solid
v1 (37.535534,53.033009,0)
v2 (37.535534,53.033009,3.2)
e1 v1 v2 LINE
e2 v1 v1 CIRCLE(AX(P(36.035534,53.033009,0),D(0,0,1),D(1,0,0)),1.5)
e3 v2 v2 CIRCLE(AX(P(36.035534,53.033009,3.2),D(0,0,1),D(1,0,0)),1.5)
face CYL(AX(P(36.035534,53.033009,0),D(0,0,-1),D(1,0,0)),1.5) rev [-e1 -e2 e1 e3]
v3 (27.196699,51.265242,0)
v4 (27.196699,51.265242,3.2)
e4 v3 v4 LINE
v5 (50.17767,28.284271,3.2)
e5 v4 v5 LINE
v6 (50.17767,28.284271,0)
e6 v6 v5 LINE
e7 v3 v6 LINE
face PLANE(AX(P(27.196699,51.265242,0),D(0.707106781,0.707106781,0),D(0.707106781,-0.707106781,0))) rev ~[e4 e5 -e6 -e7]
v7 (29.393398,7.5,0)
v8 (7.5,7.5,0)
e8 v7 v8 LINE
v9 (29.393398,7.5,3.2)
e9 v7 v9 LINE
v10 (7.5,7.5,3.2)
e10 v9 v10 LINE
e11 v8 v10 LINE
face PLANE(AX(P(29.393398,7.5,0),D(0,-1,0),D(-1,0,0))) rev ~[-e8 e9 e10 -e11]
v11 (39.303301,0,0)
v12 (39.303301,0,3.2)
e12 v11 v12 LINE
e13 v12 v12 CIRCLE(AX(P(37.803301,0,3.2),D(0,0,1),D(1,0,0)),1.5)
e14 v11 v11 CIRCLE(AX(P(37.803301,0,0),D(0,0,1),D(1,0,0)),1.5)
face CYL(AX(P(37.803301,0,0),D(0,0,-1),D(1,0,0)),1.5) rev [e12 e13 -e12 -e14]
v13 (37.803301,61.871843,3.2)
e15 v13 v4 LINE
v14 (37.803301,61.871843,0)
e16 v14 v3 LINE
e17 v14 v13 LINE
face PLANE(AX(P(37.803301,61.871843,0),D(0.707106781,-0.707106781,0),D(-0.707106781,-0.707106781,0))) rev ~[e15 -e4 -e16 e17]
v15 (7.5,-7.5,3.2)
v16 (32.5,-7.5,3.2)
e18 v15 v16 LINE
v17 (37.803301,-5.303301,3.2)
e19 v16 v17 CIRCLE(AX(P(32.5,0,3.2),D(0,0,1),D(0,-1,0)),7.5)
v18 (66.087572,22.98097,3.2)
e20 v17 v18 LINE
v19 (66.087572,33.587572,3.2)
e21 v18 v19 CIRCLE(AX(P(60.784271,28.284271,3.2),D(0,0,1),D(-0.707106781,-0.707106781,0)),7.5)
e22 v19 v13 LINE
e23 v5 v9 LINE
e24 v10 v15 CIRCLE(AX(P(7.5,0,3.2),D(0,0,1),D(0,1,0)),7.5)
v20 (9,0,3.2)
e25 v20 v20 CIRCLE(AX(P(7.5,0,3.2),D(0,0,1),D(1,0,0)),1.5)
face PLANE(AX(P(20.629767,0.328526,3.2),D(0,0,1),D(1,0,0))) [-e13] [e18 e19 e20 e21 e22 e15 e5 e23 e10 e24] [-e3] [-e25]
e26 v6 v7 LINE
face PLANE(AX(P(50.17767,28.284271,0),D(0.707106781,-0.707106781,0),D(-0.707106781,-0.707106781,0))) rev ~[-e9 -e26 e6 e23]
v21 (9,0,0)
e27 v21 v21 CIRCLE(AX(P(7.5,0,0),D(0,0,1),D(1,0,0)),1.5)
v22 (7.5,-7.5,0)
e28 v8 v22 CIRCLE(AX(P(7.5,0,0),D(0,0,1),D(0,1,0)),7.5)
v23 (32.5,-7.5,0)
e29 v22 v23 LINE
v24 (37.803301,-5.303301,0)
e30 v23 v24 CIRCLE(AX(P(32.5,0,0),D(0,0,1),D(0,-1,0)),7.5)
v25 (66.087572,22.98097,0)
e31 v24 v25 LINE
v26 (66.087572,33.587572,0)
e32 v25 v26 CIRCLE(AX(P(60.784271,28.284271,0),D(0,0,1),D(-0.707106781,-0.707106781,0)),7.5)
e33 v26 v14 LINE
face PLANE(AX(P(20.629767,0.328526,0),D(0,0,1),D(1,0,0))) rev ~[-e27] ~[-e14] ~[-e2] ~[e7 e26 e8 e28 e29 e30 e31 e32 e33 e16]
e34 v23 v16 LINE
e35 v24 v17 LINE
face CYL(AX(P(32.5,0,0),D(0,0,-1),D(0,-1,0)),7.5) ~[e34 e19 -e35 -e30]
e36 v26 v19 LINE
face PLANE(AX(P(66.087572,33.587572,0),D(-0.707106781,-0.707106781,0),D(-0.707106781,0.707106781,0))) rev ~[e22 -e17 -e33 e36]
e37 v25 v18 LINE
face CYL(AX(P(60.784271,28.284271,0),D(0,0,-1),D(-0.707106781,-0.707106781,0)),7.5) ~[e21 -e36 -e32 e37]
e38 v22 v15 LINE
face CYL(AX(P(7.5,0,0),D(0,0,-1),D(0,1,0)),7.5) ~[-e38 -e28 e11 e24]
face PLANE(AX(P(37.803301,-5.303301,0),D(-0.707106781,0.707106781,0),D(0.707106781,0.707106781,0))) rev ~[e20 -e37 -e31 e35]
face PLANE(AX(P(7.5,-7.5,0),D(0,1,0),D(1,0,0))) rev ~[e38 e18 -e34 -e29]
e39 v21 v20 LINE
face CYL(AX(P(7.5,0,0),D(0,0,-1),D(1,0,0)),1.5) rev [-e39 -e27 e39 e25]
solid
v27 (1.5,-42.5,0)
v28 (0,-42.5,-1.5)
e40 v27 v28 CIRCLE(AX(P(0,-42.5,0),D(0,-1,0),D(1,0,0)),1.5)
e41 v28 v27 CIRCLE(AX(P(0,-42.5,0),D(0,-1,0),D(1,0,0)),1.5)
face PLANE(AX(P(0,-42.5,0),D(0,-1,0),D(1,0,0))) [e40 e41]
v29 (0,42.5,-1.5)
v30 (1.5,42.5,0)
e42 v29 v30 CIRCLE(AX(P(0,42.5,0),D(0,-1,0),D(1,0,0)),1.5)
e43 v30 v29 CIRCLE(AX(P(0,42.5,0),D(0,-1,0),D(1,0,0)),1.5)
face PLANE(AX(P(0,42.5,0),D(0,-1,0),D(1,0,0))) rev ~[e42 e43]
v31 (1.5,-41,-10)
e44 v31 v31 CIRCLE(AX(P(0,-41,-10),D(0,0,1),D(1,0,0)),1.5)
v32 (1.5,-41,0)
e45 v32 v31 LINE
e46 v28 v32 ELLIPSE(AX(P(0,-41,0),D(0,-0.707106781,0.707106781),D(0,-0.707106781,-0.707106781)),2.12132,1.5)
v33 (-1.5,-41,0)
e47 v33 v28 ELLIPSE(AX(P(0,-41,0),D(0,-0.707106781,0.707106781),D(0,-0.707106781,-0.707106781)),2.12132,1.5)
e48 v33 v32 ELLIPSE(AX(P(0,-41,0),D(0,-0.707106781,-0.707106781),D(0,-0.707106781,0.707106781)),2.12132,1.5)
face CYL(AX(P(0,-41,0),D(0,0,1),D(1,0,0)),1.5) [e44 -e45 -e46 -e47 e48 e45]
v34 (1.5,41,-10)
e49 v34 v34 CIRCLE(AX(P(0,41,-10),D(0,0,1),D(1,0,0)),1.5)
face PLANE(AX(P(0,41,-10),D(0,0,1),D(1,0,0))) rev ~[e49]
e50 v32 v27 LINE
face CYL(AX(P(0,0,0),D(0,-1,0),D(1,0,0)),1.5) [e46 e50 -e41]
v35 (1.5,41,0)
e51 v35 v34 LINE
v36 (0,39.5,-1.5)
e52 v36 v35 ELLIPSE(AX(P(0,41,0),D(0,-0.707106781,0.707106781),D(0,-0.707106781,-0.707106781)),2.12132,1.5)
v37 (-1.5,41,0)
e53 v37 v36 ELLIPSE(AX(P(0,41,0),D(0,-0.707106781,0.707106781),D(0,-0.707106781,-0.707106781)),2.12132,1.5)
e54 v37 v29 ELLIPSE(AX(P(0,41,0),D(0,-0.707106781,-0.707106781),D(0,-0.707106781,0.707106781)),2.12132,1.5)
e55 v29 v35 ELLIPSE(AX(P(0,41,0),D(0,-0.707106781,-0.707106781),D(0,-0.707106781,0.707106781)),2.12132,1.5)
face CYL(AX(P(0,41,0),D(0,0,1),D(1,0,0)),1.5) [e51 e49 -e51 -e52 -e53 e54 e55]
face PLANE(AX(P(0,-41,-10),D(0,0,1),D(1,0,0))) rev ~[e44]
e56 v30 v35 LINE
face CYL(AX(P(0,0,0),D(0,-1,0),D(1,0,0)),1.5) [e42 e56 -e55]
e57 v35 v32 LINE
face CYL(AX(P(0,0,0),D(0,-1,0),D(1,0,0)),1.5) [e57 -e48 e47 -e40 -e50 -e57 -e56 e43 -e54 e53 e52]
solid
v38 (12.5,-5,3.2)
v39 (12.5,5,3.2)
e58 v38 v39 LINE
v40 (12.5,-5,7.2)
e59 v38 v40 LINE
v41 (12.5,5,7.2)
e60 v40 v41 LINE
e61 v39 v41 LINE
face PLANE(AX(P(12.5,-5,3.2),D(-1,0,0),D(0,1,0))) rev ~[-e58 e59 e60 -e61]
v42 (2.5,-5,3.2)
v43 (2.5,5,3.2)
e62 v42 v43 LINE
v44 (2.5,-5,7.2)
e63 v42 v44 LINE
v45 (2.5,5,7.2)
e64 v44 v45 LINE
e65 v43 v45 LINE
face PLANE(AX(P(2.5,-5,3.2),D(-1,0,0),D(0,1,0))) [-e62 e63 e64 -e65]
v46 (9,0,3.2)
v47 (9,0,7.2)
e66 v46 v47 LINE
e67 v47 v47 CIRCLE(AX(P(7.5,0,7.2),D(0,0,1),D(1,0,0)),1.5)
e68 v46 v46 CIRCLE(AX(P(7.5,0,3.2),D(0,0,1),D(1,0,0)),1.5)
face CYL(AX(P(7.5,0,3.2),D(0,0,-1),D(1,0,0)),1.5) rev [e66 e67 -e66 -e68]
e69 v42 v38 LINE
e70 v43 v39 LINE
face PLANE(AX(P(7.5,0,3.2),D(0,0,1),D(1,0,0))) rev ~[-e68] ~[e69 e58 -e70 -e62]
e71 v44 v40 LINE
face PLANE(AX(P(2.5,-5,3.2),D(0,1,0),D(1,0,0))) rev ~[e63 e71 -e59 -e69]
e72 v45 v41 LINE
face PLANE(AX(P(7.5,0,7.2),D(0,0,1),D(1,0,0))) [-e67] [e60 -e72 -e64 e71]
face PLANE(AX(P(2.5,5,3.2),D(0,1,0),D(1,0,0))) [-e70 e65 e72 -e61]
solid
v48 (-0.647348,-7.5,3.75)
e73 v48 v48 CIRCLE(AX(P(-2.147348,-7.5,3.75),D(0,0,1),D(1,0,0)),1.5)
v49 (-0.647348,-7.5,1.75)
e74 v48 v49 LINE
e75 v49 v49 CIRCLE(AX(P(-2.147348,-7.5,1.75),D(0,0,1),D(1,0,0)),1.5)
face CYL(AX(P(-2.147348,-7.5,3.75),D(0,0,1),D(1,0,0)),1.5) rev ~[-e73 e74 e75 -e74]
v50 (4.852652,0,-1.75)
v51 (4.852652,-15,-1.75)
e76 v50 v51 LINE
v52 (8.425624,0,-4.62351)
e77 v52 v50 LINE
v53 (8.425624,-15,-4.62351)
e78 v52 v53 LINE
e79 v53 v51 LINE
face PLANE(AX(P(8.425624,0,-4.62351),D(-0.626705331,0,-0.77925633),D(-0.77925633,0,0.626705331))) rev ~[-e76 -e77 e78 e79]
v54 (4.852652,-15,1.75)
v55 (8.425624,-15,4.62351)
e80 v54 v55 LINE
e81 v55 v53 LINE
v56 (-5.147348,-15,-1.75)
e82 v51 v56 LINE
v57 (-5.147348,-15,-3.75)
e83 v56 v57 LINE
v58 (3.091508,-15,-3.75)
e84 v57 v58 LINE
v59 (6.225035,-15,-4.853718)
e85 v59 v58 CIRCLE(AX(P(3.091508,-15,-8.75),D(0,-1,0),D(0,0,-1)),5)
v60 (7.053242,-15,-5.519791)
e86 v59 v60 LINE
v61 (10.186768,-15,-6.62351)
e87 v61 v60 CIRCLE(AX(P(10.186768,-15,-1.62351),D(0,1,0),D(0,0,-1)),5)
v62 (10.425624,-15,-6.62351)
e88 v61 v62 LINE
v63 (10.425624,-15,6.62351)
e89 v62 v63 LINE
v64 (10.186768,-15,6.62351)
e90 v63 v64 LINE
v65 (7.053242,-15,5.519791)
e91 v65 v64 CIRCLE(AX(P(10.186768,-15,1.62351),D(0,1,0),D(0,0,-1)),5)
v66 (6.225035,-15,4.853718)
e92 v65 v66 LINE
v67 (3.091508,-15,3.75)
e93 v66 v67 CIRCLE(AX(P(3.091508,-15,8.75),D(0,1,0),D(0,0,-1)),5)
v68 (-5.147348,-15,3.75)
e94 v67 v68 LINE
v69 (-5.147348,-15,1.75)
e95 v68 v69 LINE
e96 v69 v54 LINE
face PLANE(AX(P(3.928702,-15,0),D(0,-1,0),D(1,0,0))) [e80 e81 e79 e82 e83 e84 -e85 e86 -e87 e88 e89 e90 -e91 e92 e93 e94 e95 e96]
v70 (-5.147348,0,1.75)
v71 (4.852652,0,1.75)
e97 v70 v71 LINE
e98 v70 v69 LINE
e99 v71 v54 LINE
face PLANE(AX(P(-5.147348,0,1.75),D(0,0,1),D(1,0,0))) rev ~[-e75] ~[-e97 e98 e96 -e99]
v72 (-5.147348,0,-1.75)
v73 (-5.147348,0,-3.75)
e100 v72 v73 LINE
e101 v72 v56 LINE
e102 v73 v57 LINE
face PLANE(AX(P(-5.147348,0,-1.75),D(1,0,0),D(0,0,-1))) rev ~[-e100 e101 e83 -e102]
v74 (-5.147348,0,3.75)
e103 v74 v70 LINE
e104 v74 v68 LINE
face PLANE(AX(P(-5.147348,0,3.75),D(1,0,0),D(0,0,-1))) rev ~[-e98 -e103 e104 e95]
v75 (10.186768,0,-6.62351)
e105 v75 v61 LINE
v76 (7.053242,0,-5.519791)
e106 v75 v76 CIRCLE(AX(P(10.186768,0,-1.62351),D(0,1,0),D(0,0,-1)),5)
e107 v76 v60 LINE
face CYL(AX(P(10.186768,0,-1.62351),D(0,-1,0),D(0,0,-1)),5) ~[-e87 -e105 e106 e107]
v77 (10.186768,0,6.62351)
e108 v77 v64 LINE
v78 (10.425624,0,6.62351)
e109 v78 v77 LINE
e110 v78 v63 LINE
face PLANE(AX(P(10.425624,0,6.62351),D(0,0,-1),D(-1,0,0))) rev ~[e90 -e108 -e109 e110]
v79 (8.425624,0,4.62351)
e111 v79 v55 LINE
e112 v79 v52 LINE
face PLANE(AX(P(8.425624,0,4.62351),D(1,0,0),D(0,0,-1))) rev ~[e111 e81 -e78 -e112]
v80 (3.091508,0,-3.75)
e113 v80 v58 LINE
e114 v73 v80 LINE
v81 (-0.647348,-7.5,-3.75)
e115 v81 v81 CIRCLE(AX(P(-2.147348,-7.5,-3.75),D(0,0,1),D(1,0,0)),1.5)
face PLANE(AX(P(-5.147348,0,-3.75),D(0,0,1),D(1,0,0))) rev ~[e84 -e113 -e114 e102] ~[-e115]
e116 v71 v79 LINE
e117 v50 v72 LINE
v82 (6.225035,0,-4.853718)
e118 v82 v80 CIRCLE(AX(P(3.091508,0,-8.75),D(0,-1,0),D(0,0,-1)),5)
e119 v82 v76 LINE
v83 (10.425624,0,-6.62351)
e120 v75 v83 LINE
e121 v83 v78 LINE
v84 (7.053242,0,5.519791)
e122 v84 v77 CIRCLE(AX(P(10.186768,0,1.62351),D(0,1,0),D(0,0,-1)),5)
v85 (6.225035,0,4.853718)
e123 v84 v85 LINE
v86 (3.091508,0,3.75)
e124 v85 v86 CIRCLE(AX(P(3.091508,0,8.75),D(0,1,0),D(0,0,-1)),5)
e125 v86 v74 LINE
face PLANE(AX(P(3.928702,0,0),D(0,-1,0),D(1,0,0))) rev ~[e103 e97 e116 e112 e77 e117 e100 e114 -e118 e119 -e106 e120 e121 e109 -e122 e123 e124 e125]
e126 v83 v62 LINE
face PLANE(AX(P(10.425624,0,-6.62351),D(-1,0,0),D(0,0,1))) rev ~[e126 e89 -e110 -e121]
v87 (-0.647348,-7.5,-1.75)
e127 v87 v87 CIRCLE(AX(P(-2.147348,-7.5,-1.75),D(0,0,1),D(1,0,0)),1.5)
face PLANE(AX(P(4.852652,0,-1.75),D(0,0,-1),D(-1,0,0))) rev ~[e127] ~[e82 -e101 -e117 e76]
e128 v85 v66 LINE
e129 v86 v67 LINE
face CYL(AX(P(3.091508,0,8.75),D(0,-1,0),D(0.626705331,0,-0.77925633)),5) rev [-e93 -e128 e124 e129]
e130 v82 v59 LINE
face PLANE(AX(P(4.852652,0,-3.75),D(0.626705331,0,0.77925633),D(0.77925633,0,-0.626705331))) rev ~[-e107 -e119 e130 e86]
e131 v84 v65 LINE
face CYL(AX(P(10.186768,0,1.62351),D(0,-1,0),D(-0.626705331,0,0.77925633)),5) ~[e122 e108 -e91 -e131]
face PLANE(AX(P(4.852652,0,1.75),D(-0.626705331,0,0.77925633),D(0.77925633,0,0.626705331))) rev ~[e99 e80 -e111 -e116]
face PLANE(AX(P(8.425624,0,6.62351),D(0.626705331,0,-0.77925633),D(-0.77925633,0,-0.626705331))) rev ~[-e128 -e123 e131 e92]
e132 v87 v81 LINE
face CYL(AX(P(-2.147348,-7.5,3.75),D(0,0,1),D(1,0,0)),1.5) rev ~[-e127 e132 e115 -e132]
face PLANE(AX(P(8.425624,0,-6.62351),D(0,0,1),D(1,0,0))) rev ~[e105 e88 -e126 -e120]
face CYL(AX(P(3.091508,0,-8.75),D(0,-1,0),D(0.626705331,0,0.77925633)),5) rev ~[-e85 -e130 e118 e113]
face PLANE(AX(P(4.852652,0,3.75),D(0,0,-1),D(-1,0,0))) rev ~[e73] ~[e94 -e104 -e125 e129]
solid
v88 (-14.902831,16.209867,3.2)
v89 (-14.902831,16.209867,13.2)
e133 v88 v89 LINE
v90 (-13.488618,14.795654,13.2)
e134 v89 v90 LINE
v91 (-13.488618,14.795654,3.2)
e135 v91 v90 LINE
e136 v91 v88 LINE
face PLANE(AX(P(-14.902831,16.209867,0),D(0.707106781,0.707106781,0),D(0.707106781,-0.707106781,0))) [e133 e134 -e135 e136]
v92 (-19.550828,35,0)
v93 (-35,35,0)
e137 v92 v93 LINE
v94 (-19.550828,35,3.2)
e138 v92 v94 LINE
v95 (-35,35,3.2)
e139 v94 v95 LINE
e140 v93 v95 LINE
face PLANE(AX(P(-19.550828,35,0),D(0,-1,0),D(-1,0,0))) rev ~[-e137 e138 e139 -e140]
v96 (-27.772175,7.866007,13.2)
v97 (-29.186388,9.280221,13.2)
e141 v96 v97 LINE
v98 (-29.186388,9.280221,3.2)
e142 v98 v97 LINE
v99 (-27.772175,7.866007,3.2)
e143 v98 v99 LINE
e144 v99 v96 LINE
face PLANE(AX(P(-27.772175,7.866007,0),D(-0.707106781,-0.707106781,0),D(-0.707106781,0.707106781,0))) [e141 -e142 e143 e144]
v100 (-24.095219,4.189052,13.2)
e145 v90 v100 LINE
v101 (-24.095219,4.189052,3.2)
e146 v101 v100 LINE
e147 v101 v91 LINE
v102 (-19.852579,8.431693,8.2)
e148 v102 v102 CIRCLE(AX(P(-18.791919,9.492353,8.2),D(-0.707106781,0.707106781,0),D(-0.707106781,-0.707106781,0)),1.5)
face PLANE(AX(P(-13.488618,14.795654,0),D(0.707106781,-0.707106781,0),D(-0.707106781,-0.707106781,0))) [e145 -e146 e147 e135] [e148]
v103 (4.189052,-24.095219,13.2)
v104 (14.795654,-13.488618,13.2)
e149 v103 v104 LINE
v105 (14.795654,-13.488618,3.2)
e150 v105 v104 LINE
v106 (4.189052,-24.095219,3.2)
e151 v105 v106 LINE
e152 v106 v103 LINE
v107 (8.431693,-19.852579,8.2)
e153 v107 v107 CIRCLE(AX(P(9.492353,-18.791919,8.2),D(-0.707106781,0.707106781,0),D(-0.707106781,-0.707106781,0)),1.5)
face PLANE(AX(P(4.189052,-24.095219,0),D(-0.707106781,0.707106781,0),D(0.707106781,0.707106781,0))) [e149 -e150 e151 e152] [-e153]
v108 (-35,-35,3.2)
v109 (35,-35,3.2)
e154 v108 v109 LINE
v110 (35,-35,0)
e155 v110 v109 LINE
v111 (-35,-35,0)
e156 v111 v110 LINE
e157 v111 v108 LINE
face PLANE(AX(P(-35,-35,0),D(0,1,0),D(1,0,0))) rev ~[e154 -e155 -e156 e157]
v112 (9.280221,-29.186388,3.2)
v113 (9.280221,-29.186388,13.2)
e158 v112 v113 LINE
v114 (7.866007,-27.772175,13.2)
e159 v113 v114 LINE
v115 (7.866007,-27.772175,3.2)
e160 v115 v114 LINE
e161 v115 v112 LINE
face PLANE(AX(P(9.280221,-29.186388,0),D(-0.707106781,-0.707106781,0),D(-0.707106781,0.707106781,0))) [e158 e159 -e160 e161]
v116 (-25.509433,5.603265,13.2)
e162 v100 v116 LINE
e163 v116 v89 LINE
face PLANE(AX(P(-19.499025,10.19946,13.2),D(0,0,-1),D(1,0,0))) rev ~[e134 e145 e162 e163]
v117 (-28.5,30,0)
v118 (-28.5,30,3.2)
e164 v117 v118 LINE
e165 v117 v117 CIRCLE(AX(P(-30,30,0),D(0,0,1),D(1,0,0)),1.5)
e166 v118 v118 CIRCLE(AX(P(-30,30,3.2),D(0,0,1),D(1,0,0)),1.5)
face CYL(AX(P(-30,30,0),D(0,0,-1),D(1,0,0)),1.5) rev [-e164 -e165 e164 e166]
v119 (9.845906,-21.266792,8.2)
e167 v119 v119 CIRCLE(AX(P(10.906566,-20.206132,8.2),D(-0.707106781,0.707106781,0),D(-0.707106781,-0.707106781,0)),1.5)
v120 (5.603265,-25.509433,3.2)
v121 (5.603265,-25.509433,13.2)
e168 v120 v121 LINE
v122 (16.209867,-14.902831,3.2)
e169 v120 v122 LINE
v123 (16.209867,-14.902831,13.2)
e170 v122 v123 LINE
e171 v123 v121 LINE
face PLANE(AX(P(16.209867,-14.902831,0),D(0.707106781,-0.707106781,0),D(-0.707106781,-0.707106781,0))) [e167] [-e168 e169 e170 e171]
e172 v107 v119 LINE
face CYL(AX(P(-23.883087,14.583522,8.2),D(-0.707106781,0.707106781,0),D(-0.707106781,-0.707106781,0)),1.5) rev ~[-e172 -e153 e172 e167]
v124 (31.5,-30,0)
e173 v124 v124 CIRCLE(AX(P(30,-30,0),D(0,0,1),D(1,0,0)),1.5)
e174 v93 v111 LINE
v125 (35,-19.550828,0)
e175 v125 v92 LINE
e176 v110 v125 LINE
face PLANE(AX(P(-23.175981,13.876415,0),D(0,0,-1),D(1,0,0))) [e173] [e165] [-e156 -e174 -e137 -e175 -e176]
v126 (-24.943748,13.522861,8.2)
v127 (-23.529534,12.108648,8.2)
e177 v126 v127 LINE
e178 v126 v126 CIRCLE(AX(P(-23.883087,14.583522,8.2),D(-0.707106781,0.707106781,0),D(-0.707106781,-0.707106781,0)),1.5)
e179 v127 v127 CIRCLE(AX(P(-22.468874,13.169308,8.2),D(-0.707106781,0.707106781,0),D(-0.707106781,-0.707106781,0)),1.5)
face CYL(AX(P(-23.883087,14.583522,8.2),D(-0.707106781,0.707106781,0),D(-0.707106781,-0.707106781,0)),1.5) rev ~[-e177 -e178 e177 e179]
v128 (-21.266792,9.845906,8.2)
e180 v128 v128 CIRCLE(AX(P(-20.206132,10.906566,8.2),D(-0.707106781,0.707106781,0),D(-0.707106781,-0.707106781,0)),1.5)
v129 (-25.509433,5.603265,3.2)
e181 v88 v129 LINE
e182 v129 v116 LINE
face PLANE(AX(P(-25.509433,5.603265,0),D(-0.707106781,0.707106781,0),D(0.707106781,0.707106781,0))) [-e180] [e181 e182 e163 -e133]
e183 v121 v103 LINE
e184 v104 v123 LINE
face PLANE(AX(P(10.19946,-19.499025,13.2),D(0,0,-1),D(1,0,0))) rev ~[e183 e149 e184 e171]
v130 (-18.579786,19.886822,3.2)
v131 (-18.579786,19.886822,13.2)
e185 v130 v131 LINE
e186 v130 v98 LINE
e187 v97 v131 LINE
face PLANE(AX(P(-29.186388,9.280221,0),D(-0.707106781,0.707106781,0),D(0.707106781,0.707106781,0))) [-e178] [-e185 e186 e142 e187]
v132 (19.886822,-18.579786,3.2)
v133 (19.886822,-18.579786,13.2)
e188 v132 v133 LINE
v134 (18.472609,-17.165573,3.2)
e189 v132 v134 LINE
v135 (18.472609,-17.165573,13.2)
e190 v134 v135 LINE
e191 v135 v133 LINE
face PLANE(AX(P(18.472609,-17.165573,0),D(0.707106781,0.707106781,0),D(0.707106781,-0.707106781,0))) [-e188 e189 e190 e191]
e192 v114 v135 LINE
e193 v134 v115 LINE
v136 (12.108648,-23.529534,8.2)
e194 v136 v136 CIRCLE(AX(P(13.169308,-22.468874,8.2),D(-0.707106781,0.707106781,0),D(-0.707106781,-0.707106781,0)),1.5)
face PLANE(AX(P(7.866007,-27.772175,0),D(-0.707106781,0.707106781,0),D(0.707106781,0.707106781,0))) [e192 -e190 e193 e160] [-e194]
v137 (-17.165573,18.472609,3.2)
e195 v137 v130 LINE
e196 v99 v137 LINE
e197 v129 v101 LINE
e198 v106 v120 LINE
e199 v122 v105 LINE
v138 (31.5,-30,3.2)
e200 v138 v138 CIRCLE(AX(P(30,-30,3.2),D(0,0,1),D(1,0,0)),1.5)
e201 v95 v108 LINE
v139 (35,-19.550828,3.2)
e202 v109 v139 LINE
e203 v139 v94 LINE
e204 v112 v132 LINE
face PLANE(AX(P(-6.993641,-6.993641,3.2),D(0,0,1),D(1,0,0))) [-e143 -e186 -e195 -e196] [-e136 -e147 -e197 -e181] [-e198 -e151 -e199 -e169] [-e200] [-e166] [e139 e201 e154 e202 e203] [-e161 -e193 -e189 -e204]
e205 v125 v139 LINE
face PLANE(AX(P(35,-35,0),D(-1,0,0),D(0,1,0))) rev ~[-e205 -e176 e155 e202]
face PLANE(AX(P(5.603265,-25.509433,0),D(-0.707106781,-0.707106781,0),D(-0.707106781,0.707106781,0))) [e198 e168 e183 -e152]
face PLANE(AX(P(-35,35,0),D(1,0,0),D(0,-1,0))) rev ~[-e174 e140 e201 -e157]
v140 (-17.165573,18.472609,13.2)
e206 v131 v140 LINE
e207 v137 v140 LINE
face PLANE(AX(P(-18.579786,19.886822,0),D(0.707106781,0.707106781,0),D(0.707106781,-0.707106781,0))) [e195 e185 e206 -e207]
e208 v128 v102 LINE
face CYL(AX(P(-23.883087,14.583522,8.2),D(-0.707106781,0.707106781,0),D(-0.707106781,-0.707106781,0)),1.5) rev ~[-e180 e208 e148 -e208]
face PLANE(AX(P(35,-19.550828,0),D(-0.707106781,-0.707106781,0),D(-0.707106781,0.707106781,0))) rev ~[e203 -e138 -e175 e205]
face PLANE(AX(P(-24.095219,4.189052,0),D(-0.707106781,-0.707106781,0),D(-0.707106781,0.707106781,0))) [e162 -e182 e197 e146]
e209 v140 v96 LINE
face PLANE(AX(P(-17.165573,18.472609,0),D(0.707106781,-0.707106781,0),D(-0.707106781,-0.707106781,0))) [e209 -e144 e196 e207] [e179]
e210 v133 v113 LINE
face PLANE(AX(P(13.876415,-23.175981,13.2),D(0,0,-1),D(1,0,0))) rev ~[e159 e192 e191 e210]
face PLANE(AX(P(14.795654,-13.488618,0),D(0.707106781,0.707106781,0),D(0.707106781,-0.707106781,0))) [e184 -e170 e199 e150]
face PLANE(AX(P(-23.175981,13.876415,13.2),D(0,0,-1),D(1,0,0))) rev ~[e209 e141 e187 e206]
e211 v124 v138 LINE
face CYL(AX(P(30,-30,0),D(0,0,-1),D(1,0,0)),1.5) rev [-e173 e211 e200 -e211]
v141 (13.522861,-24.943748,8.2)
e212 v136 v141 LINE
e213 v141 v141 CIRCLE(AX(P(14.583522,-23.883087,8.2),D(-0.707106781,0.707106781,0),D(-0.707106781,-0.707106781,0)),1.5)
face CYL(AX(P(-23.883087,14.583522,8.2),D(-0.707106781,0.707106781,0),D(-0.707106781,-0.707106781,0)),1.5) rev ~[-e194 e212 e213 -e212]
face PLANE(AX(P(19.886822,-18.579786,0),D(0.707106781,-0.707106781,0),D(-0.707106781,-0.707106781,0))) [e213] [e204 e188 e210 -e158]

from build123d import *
from build123d import SkipClean  # not in build123d's __all__

# Parameters (mm, degrees)
F0_R      = 1.5
F1_DEPTH  = 3.2
F2_R      = 1.5
F3_DEPTH  = 3.2
F5_DEPTH  = 15
F6_R      = 1.5
F7_DEPTH  = 25
F8_R      = 5
F9_R      = 5
F10_W     = 10
F10_H     = 10
F10_R     = 1.5
F11_DEPTH = 4
F13_DEPTH = 13.2
F14_R     = 1.5
F15_DEPTH = 60
F16_R     = 1.5
F17_DEPTH = 42.5
F18_R     = 1.5
F19_DEPTH = 10
F20_R     = 1.5
F21_DEPTH = 10


with BuildPart() as f1:
    # F0 (on Top) → F1 (new body)
    with BuildSketch(Plane.XY):
        with BuildLine():
            Line((29.3933982822, 7.5), (7.5, 7.5))
            ThreePointArc((7.5, 7.5), (0, 0), (7.5, -7.5))
            Line((7.5, -7.5), (32.5, -7.5))
            ThreePointArc((32.5, -7.5), (35.3701257427, -6.9290964938), (37.8033008589, -5.3033008589))
            ThreePointArc((37.8033008589, -5.3033008589), (39.4290964938, 2.8701257427), (32.5, 7.5))
            ThreePointArc((32.5, 7.5), (29.6298742573, 6.9290964938), (27.1966991411, 5.3033008589))
            Line((27.1966991411, 5.3033008589), (29.3933982822, 7.5))
        make_face()
        with Locations((7.5, 0)):
            Circle(F0_R, mode=Mode.SUBTRACT)
        with Locations((37.8033008589, 0)):
            Circle(F0_R, mode=Mode.SUBTRACT)
        with BuildLine():
            Line((50.1776695297, 28.2842712475), (29.3933982822, 7.5))
            Line((29.3933982822, 7.5), (32.5, 7.5))
            ThreePointArc((32.5, 7.5), (39.4290964938, 2.8701257427), (37.8033008589, -5.3033008589))
            Line((37.8033008589, -5.3033008589), (66.0875721064, 22.9809703886))
            ThreePointArc((66.0875721064, 22.9809703886), (60.7842712475, 20.7842712475), (55.4809703886, 22.9809703886))
            Line((55.4809703886, 22.9809703886), (50.1776695297, 28.2842712475))
        make_face()
        with BuildLine():
            Line((32.5, 7.5), (29.3933982822, 7.5))
            Line((29.3933982822, 7.5), (27.1966991411, 5.3033008589))
            ThreePointArc((27.1966991411, 5.3033008589), (29.6298742573, 6.9290964938), (32.5, 7.5))
        make_face()
        with BuildLine():
            Line((27.1966991411, 51.265241636), (50.1776695297, 28.2842712475))
            Line((50.1776695297, 28.2842712475), (55.4809703886, 33.5875721064))
            ThreePointArc((55.4809703886, 33.5875721064), (60.7842712475, 35.7842712475), (66.0875721064, 33.5875721064))
            Line((66.0875721064, 33.5875721064), (37.8033008589, 61.8718433538))
            Line((37.8033008589, 61.8718433538), (27.1966991411, 51.265241636))
        make_face()
        with Locations((36.0355339059, 53.033008589)):
            Circle(F0_R, mode=Mode.SUBTRACT)
        with BuildLine():
            Line((55.4809703886, 33.5875721064), (50.1776695297, 28.2842712475))
            Line((50.1776695297, 28.2842712475), (55.4809703886, 22.9809703886))
            ThreePointArc((55.4809703886, 22.9809703886), (60.7842712475, 20.7842712475), (66.0875721064, 22.9809703886))
            ThreePointArc((66.0875721064, 22.9809703886), (68.2842712475, 28.2842712475), (66.0875721064, 33.5875721064))
            ThreePointArc((66.0875721064, 33.5875721064), (60.7842712475, 35.7842712475), (55.4809703886, 33.5875721064))
        make_face()
    extrude(amount=F1_DEPTH)


with BuildPart() as f3:
    # F2 (on Top) → F3 (new body)
    with BuildSketch(Plane.XY):
        Polygon((-35, -35), (35, -35), (35, -19.5508284215), (-19.5508284215, 35), (-35, 35), align=None)
        with Locations((30, -30)):
            Circle(F2_R, mode=Mode.SUBTRACT)
        with Locations((-30, 30)):
            Circle(F2_R, mode=Mode.SUBTRACT)
    extrude(amount=F3_DEPTH)

    # F12 (on face) → F13 (join)
    with BuildSketch(Plane(origin=(0, 0, 0), x_dir=(1, 0, 0), z_dir=(0, 0, -1))):
        Polygon((-17.1655729085, -18.4726088633), (-27.7721746263, -7.8660071455), (-29.1863881887, -9.2802207079), (-18.5797864709, -19.8868224257), align=None)
        Polygon((-24.0952193641, -4.1890518833), (-25.5094329265, -5.6032654457), (-14.9028312087, -16.2098671635), (-13.4886176463, -14.7956536011), align=None)
        Polygon((4.1890518833, 24.0952193641), (14.7956536011, 13.4886176463), (16.2098671635, 14.9028312087), (5.6032654457, 25.5094329265), align=None)
        Polygon((9.2802207079, 29.1863881887), (7.8660071455, 27.7721746263), (18.4726088633, 17.1655729085), (19.8868224257, 18.5797864709), align=None)
    extrude(amount=-F13_DEPTH)

    # F14 (on face) → F15 (cut)
    with BuildSketch(Plane(origin=(-19.2333044483, 19.2333044483, 0), x_dir=(-0.7071067812, -0.7071067812, 0), z_dir=(-0.7071067812, 0.7071067812, 0))):
        with Locations((6.5757860131, 8.2)):
            Circle(F14_R)
    extrude(amount=-F15_DEPTH, mode=Mode.SUBTRACT)


with BuildPart() as f5:
    # F4 (on Front) → F5 (new body)
    with BuildSketch(Plane.XZ):
        Polygon((8.4256241946, 0), (8.4256241946, -4.6235096101), (4.852652266, -1.75), (-5.147347734, -1.75), (-5.147347734, -3.75), (4.852652266, -3.75), (8.4256241946, -6.6235096101), (10.4256241946, -6.6235096101), (10.4256241946, 0), (10.4256241946, 6.6235096101), (8.4256241946, 6.6235096101), (4.852652266, 3.75), (-5.147347734, 3.75), (-5.147347734, 1.75), (4.852652266, 1.75), (8.4256241946, 4.6235096101), align=None)
    extrude(amount=F5_DEPTH)

    # F6 (on face) → F7 (cut)
    with BuildSketch(Plane.XY.offset(3.75)):
        with Locations((-2.147347734, -7.5)):
            Circle(F6_R)
    extrude(amount=-F7_DEPTH, mode=Mode.SUBTRACT)

    # F8
    f8_edges = [f5.edges().sort_by_distance(p)[0] for p in [
        (4.852652, -7.5, 3.75),
    ]]
    fillet(f8_edges, radius=F8_R)

    # F9
    f9_edges = [f5.edges().sort_by_distance(p)[0] for p in [
        (4.852652, -7.5, -3.75),
        (8.425624, -7.5, -6.62351),
        (8.425624, -7.5, 6.62351),
    ]]
    fillet(f9_edges, radius=F9_R)


with BuildPart() as f11:
    # F10 (on face) → F11 (new body)
    with BuildSketch(Plane.XY.offset(3.2)):
        with Locations((7.5, 0)):
            Rectangle(F10_W, F10_H)
        with Locations((7.5, 0)):
            Circle(F10_R, mode=Mode.SUBTRACT)
    extrude(amount=F11_DEPTH)


with BuildPart() as f17:
    # F16 (on Front) → F17 (new body, symmetric)
    with BuildSketch(Plane.XZ):
        Circle(F16_R)
    extrude(amount=F17_DEPTH, both=True)

    # F18 (on Top) → F19 (join)
    with BuildSketch(Plane.XY):
        with Locations((0, -41)):
            Circle(F18_R)
    extrude(amount=-F19_DEPTH)

    # F20 (on Top) → F21 (join)
    with BuildSketch(Plane.XY):
        with Locations((0, 41)):
            Circle(F20_R)
    with SkipClean():  # cleaning this boolean's faces spoils the solid; the shape is the same uncleaned
        extrude(amount=-F21_DEPTH)


solid = Compound([f1.part, f3.part, f5.part, f11.part, f17.part])
